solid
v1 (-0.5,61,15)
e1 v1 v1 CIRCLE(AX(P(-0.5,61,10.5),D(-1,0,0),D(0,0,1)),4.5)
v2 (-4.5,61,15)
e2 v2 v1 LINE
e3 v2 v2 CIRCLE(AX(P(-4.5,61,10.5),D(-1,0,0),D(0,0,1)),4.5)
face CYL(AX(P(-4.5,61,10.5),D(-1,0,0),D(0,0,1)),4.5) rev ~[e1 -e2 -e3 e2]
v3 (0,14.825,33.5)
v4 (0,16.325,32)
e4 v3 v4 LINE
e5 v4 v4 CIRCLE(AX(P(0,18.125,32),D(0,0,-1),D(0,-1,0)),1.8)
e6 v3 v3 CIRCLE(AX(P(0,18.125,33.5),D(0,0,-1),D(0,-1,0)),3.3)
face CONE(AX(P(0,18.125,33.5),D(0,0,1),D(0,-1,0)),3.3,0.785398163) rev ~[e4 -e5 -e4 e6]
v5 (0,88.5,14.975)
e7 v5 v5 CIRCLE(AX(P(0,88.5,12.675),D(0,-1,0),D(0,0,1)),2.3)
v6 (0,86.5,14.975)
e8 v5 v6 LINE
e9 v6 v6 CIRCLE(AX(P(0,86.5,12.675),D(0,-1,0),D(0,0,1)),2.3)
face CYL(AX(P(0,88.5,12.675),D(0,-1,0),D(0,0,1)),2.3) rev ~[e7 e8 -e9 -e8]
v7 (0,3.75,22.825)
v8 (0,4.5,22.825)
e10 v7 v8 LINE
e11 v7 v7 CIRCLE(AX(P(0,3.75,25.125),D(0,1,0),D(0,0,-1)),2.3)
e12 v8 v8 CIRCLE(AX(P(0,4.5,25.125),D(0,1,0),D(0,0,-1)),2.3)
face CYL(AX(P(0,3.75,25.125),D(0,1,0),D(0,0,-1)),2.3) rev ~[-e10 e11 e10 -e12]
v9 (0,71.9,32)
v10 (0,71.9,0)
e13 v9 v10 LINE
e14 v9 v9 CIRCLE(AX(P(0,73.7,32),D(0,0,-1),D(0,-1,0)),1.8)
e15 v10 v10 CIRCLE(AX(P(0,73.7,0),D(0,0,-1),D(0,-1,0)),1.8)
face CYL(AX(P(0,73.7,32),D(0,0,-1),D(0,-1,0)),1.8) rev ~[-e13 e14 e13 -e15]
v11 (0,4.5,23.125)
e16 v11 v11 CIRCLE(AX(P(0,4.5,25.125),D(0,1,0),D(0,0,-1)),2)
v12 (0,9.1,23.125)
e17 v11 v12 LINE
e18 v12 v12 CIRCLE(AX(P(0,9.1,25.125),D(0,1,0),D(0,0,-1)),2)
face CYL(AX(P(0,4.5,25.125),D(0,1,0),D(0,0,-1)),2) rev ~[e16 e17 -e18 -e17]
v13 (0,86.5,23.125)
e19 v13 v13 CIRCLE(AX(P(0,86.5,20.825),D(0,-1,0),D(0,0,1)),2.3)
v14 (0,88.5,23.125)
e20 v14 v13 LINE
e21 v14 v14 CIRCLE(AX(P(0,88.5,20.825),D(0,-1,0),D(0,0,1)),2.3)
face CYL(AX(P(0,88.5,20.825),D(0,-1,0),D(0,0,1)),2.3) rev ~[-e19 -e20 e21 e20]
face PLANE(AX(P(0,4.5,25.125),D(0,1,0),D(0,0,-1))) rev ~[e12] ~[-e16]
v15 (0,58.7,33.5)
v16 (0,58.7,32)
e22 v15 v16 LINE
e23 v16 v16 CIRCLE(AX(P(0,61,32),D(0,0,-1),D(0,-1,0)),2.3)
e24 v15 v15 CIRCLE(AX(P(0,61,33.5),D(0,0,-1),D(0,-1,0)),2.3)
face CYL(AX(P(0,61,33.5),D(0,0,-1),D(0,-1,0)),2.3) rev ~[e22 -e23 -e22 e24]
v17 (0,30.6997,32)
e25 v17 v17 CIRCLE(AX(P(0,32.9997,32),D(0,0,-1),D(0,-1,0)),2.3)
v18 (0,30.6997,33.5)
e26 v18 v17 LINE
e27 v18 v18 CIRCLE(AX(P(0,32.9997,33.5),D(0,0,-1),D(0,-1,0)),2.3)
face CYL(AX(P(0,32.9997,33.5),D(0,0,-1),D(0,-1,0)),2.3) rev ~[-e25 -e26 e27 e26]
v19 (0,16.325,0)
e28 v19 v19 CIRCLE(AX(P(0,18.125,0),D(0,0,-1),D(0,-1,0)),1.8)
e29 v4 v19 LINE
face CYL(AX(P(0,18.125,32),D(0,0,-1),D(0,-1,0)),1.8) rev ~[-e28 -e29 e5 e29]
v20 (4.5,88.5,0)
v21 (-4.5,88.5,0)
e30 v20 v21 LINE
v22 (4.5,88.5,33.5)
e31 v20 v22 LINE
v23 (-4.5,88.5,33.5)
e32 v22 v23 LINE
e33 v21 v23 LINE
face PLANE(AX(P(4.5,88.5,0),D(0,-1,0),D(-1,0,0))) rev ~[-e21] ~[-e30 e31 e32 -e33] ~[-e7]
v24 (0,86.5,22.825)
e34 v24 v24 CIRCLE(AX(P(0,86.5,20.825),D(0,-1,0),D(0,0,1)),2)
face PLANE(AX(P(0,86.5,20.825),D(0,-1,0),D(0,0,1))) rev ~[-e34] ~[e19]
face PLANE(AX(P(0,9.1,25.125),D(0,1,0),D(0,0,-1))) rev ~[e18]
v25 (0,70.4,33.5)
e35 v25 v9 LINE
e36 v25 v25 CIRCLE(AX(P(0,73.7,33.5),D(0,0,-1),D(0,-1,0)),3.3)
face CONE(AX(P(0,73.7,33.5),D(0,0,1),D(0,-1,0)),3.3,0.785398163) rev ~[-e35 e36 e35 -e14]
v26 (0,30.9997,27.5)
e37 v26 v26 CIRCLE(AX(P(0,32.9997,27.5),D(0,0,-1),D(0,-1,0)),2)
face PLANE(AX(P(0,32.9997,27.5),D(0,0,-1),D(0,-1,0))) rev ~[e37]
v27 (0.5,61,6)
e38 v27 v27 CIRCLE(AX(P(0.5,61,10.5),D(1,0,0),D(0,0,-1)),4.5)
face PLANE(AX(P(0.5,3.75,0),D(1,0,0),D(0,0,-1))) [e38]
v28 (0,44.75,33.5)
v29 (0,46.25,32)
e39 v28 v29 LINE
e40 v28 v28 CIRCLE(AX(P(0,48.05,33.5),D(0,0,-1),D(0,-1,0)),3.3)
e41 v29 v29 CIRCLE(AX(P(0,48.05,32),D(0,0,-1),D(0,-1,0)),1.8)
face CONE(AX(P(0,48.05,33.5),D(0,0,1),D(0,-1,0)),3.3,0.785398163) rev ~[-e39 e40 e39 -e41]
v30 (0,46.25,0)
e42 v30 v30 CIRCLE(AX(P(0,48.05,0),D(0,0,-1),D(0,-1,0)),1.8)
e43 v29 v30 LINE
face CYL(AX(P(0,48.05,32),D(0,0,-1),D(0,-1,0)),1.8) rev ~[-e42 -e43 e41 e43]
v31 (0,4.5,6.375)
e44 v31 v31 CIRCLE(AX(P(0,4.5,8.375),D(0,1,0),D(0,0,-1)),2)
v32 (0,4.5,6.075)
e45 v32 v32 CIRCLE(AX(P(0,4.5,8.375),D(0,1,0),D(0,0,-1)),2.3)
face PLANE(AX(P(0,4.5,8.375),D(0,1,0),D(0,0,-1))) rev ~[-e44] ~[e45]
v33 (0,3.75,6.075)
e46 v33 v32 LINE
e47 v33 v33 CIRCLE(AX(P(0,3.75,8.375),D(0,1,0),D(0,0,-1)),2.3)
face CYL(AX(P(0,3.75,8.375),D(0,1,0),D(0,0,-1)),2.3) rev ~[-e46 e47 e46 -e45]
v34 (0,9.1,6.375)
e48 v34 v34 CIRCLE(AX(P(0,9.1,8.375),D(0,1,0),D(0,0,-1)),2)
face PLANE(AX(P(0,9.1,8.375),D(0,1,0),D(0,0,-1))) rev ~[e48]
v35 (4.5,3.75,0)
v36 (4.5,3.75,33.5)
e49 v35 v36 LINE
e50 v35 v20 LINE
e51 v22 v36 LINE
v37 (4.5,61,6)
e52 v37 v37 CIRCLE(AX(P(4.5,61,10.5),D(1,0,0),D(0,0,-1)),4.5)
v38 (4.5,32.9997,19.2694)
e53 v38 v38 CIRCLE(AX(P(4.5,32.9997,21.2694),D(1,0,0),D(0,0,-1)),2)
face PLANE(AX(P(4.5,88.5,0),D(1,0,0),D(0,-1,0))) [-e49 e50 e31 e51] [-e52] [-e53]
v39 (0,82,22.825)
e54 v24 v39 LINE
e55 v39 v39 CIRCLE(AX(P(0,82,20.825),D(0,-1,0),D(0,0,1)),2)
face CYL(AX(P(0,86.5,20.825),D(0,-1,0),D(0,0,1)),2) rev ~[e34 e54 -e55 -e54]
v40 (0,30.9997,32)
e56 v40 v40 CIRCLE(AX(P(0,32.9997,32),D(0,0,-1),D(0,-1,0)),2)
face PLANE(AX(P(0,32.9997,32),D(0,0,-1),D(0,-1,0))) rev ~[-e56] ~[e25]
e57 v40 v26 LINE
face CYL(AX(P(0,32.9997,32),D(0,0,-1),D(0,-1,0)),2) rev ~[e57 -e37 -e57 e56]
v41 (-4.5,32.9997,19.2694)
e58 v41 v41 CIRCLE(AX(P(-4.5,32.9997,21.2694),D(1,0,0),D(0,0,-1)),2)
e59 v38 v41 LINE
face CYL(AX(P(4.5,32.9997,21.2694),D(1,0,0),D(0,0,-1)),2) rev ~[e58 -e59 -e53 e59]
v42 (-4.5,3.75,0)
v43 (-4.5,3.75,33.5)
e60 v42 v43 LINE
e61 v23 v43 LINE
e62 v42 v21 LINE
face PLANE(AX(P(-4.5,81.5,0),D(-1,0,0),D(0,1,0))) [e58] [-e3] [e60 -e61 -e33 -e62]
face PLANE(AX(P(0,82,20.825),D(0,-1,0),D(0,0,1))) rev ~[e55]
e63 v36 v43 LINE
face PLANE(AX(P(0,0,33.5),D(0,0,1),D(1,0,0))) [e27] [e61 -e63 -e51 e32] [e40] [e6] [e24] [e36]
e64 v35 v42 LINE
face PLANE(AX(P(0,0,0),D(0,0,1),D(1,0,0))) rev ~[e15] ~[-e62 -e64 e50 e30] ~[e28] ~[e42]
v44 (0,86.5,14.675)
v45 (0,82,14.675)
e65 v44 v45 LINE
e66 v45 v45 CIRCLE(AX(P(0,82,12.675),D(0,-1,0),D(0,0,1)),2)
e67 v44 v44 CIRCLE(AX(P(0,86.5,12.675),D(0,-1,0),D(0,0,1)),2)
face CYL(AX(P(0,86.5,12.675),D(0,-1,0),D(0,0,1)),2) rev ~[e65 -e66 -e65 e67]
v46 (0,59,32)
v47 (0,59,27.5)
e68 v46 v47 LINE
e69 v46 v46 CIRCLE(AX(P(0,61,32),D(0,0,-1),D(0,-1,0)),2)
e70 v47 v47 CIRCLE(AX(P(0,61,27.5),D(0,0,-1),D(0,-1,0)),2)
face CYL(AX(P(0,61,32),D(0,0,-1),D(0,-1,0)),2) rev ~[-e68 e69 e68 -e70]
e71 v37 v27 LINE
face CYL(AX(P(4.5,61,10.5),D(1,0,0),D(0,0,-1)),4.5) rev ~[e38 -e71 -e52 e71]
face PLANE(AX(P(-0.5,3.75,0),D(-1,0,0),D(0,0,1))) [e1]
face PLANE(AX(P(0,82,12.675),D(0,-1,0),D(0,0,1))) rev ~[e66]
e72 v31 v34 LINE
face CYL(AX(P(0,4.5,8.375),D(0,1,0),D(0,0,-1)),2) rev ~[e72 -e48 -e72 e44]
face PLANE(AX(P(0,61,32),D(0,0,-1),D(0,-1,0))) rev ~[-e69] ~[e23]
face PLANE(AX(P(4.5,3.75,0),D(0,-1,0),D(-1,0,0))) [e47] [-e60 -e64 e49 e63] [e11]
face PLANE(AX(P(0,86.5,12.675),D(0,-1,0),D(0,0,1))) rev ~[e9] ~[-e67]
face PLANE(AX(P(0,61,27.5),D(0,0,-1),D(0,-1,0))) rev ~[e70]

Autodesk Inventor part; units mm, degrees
ref_plane "YZ Plane" through (0, 0, 0) normal (1, 0, 0) x (0, 1, 0)
ref_plane "XZ Plane" through (0, 0, 0) normal (0, 1, 0) x (-1, 0, 0)
ref_plane "Work Plane1" through (0, 0, 0) normal (0, 0, 1) x (1, 0, 0)
ref_plane "Work Plane2" through (-89, -40.3889, 33.5) normal (0, 0, 1) x (1, 0, 0)
sketch "Sketch1" plane through (0, 0, 0) normal (0, 0, 1) x (1, 0, 0)
  line L0 (23.5, 88.5) -> (-23.5, 88.5) projected
  line L1 (-23.5, 88.5) -> (-23.5, 36.5) projected
  line L2 (-26.5, 33.5) -> (-89, 33.5) projected
  line L3 (-89, 33.5) -> (-89, -72.5) projected
  line L4 (-89, -72.5) -> (-77, -72.5) projected
  line L5 (-74, -75.5) -> (-74, -93.5) projected
  line L6 (-74, -93.5) -> (74, -93.5) projected
  line L7 (74, -93.5) -> (74, -75.5) projected
  line L8 (77, -72.5) -> (89, -72.5) projected
  line L9 (89, -72.5) -> (89, 33.5) projected
  line L10 (89, 33.5) -> (26.5, 33.5) projected
  line L11 (23.5, 36.5) -> (23.5, 88.5) projected
  line L12 (-4.5, 81.5) -> (-4.5, 36.5) projected
  line L13 (-7.5, 33.5) -> (-13.5, 33.5) projected
  line L14 (-16.5, 36.5) -> (-16.5, 81.5) projected
  line L15 (-13.5, 84.5) -> (-7.5, 84.5) projected
  line L16 (16.5, 81.5) -> (16.5, 36.5) projected
  line L17 (13.5, 33.5) -> (7.5, 33.5) projected
  line L18 (4.5, 36.5) -> (4.5, 81.5) projected
  line L19 (7.5, 84.5) -> (13.5, 84.5) projected
  line L20 (-4.5, 88.5) -> (4.5, 88.5)
  line L21 (4.5, 88.5) -> (4.5, 3.75)
  line L22 (4.5, 3.75) -> (-4.5, 3.75)
  line L23 (-4.5, 3.75) -> (-4.5, 88.5)
  line L24 (-32.2, 4.75) -> (-59.9, 4.75)
  arc A0 (13.5, 33.5) -> (16.5, 36.5) centre (13.5, 36.5) ccw projected
  arc A1 (4.5, 36.5) -> (7.5, 33.5) centre (7.5, 36.5) ccw projected
  arc A2 (7.5, 84.5) -> (4.5, 81.5) centre (7.5, 81.5) ccw projected
  arc A3 (16.5, 81.5) -> (13.5, 84.5) centre (13.5, 81.5) ccw projected
  arc A4 (-4.5, 81.5) -> (-7.5, 84.5) centre (-7.5, 81.5) ccw projected
  arc A5 (-7.5, 33.5) -> (-4.5, 36.5) centre (-7.5, 36.5) ccw projected
  arc A6 (-16.5, 36.5) -> (-13.5, 33.5) centre (-13.5, 36.5) ccw projected
  arc A7 (-13.5, 84.5) -> (-16.5, 81.5) centre (-13.5, 81.5) ccw projected
  arc A8 (-26.5, 33.5) -> (-23.5, 36.5) centre (-26.5, 36.5) ccw projected
  arc A9 (-74, -75.5) -> (-77, -72.5) centre (-77, -75.5) ccw projected
  arc A10 (77, -72.5) -> (74, -75.5) centre (77, -75.5) ccw projected
  arc A11 (23.5, 36.5) -> (26.5, 33.5) centre (26.5, 36.5) ccw projected
  point P0 (0, 0)
  point P1 (-4.5, 81.5)
  point P2 (-4.5, 36.5)
  dimension "d0" = 1
extrude "Extrusion1" add sketch "Sketch1" along normal up to surface (33.5 mm away) contours L21 L18 L22 L23 L12 L0
sketch "Sketch2" plane through (4.5, 3.75, 0) normal (1, 0, 0) x (0, 0, -1)
  circle A0 centre (-21.2694, 29.2497) radius 2 projected
  point P0 (0, -3.75)
extrude "Extrusion2" cut sketch "Sketch2" against normal blind 10
sketch "Sketch3" plane through (4.5, 3.75, 0) normal (1, 0, 0) x (0, 0, -1)
  circle A0 centre (-10.5, 57.25) radius 4.5 projected
  point P0 (0, -3.75)
extrude "Extrusion3" cut sketch "Sketch3" against normal blind 4
sketch "Sketch4" plane through (-4.5, 3.75, 0) normal (-1, 0, 0) x (0, 0, 1)
  circle A0 centre (10.5, 57.25) radius 4.5 projected
  point P0 (0, -3.75)
extrude "Extrusion4" cut sketch "Sketch4" against normal blind 4
sketch "Sketch5" plane through (-4.5, 3.75, 33.5) normal (0, 0, 1) x (1, 0, 0)
  line L0 (5, 61.75) -> (5, 52.75) projected
  line L1 (4, 52.75) -> (4, 61.75) projected
  line L2 (9, 27.2497) -> (0, 27.2497) projected
  line L3 (9, 31.2497) -> (0, 31.2497) projected
  line L4 (17, 78.15) -> (-8, 78.15)
  line L5 (-8, 35.85) -> (17, 35.85)
  line L6 (9, 84.75) -> (9, 0) projected
  line L7 (0, 52.75) -> (0, 61.75) projected
  line L8 (9, 35.85) -> (0, 35.85)
  line L9 (0, 35.85) -> (0, 52.75)
  line L10 (0, 52.75) -> (9, 52.75)
  line L11 (9, 52.75) -> (9, 35.85)
  line L12 (0, 0) -> (0, 84.75) projected
  line L13 (9, 78.15) -> (0, 78.15)
  line L14 (0, 78.15) -> (0, 61.75)
  line L15 (0, 61.75) -> (9, 61.75)
  line L16 (9, 61.75) -> (9, 78.15)
  line L17 (-18, 7.625) -> (-18, 21.125) projected
  line L18 (-18, 14.375) -> (27, 14.375)
  line L19 (9, 35.85) -> (0, 52.75)
  line L20 (9, 61.75) -> (9, 52.75) projected
  line L21 (0, 35.85) -> (9, 52.75)
  line L22 (9, 61.75) -> (0, 78.15)
  line L23 (0, 61.75) -> (9, 78.15)
  point P0 (4.5, -3.75)
  point P1 (4.5, 14.375)
  point P2 (4.5, 44.3)
  point P3 (4.5, 69.95)
  dimension "d9" = 4.5
  dimension "d10" = 4.5
hole "Hole1" at (0, 18.125, 33.5) at (0, 48.05, 33.5) at (0, 73.7, 33.5) direction (0, 0, -1) diameter 3.6 end through all countersink diameter 6.6 countersink angle 90 clearance for "Countersunk Flat Head Screw ISO 2009/7046" size "M3" standard "ISO"
sketch "Sketch6" plane through (-4.5, 3.75, 0) normal (0, -1, 0) x (1, 0, 0)
  line L0 (9, 33.5) -> (0, 33.5) projected
  line L1 (0, 0) -> (0, 33.5) projected
  line L2 (0, 0) -> (9, 0) projected
  line L3 (9, 0) -> (9, 33.5) projected
  line L4 (0, 16.75) -> (9, 16.75)
  line L5 (9, 16.75) -> (0, 33.5)
  line L6 (9, 33.5) -> (0, 16.75)
  line L7 (0, 16.75) -> (9, 0)
  line L8 (9, 16.75) -> (0, 0)
  point P0 (4.5, 0)
  point P1 (4.5, 8.375)
  point P2 (4.5, 25.125)
hole "Hole2" at (0, 3.75, 8.375) at (0, 3.75, 25.125) direction (0, 1, 0) diameter 4 depth 5.35 counterbore diameter 4.6 counterbore depth 0.75
sketch "Sketch7" plane through (-4.5, 88.5, 0) normal (0, 1, 0) x (1, 0, 0)
  line L0 (0, -33.5) -> (9, -33.5) projected
  line L1 (0, -33.5) -> (9, -33.5) projected
  line L2 (9, 0) -> (9, -33.5) projected
  line L3 (9, 0) -> (0, 0) projected
  line L4 (0, 0) -> (0, -33.5) projected
  line L5 (-8, -1.4) -> (-8, -6.6) projected
  line L6 (-8, -32.1) -> (-8, -26.9) projected
  line L7 (17, -32.1) -> (17, -26.9) projected
  line L8 (17, -1.4) -> (17, -6.6) projected
  line L9 (17, -32.1) -> (-8, -32.1)
  line L10 (-8, -32.1) -> (-8, -26.9)
  line L11 (-8, -26.9) -> (17, -26.9)
  line L12 (17, -26.9) -> (17, -32.1)
  line L13 (-8, -6.6) -> (17, -6.6)
  line L14 (17, -6.6) -> (17, -1.4)
  line L15 (17, -1.4) -> (-8, -1.4)
  line L16 (-8, -1.4) -> (-8, -6.6)
  line L17 (17, -6.6) -> (-8, -6.6)
  line L18 (-8, -6.6) -> (-8, -8.6)
  line L19 (-8, -8.6) -> (17, -8.6)
  line L20 (17, -8.6) -> (17, -6.6)
  line L21 (-8, -26.9) -> (17, -26.9)
  line L22 (17, -26.9) -> (17, -24.9)
  line L23 (17, -24.9) -> (-8, -24.9)
  line L24 (-8, -24.9) -> (-8, -26.9)
  line L25 (9, 0) -> (9, -33.5) projected
  line L26 (9, -16.75) -> (0, -16.75)
  line L27 (0, 0) -> (0, -33.5) projected
  line L28 (9, -24.9) -> (0, -16.75)
  line L29 (9, -8.6) -> (0, -16.75)
  line L30 (0, -8.6) -> (9, -16.75)
  line L31 (9, -16.75) -> (0, -24.9)
  point P0 (4.5, 0)
  point P1 (4.5, -20.825)
  point P2 (4.5, -12.675)
  dimension "d25" = 2
  dimension "d26" = 2
hole "Hole3" at (0, 88.5, 20.825) at (0, 88.5, 12.675) direction (0, -1, 0) diameter 4 depth 6.5 counterbore diameter 4.6 counterbore depth 2
sketch "Sketch8" plane through (-4.5, 3.75, 33.5) normal (0, 0, 1) x (1, 0, 0)
  line L0 (26, 27.2497) -> (-17, 27.2497)
  line L1 (26, 31.2497) -> (-17, 31.2497)
  line L2 (4, 52.75) -> (-1, 52.75)
  line L3 (4, 61.75) -> (-1, 61.75)
  line L4 (10, 61.75) -> (5, 61.75)
  line L5 (9, 52.75) -> (5, 52.75) projected
  line L6 (0, 0) -> (0, 84.75) projected
  line L7 (9, 52.75) -> (0, 52.75)
  line L8 (0, 52.75) -> (0, 61.75)
  line L9 (0, 61.75) -> (9, 61.75)
  line L10 (9, 61.75) -> (9, 52.75)
  line L11 (9, 27.2497) -> (0, 27.2497) projected
  line L12 (0, 31.2497) -> (9, 31.2497)
  line L13 (9, 31.2497) -> (9, 27.2497)
  line L14 (9, 27.2497) -> (0, 27.2497)
  line L15 (0, 27.2497) -> (0, 31.2497)
  line L16 (9, 27.2497) -> (0, 31.2497)
  line L17 (0, 27.2497) -> (9, 31.2497)
  line L18 (9, 52.75) -> (0, 61.75)
  line L19 (0, 52.75) -> (9, 61.75)
  point P0 (4.5, -3.75)
  point P1 (4.5, 29.2497)
  point P2 (4.5, 57.25)
hole "Hole4" at (0, 32.9997, 33.5) at (0, 61, 33.5) direction (0, 0, -1) diameter 4 depth 6 counterbore diameter 4.6 counterbore depth 1.5
equation "\"d9\" = d10"
properties part number "middle_gear_holder"
